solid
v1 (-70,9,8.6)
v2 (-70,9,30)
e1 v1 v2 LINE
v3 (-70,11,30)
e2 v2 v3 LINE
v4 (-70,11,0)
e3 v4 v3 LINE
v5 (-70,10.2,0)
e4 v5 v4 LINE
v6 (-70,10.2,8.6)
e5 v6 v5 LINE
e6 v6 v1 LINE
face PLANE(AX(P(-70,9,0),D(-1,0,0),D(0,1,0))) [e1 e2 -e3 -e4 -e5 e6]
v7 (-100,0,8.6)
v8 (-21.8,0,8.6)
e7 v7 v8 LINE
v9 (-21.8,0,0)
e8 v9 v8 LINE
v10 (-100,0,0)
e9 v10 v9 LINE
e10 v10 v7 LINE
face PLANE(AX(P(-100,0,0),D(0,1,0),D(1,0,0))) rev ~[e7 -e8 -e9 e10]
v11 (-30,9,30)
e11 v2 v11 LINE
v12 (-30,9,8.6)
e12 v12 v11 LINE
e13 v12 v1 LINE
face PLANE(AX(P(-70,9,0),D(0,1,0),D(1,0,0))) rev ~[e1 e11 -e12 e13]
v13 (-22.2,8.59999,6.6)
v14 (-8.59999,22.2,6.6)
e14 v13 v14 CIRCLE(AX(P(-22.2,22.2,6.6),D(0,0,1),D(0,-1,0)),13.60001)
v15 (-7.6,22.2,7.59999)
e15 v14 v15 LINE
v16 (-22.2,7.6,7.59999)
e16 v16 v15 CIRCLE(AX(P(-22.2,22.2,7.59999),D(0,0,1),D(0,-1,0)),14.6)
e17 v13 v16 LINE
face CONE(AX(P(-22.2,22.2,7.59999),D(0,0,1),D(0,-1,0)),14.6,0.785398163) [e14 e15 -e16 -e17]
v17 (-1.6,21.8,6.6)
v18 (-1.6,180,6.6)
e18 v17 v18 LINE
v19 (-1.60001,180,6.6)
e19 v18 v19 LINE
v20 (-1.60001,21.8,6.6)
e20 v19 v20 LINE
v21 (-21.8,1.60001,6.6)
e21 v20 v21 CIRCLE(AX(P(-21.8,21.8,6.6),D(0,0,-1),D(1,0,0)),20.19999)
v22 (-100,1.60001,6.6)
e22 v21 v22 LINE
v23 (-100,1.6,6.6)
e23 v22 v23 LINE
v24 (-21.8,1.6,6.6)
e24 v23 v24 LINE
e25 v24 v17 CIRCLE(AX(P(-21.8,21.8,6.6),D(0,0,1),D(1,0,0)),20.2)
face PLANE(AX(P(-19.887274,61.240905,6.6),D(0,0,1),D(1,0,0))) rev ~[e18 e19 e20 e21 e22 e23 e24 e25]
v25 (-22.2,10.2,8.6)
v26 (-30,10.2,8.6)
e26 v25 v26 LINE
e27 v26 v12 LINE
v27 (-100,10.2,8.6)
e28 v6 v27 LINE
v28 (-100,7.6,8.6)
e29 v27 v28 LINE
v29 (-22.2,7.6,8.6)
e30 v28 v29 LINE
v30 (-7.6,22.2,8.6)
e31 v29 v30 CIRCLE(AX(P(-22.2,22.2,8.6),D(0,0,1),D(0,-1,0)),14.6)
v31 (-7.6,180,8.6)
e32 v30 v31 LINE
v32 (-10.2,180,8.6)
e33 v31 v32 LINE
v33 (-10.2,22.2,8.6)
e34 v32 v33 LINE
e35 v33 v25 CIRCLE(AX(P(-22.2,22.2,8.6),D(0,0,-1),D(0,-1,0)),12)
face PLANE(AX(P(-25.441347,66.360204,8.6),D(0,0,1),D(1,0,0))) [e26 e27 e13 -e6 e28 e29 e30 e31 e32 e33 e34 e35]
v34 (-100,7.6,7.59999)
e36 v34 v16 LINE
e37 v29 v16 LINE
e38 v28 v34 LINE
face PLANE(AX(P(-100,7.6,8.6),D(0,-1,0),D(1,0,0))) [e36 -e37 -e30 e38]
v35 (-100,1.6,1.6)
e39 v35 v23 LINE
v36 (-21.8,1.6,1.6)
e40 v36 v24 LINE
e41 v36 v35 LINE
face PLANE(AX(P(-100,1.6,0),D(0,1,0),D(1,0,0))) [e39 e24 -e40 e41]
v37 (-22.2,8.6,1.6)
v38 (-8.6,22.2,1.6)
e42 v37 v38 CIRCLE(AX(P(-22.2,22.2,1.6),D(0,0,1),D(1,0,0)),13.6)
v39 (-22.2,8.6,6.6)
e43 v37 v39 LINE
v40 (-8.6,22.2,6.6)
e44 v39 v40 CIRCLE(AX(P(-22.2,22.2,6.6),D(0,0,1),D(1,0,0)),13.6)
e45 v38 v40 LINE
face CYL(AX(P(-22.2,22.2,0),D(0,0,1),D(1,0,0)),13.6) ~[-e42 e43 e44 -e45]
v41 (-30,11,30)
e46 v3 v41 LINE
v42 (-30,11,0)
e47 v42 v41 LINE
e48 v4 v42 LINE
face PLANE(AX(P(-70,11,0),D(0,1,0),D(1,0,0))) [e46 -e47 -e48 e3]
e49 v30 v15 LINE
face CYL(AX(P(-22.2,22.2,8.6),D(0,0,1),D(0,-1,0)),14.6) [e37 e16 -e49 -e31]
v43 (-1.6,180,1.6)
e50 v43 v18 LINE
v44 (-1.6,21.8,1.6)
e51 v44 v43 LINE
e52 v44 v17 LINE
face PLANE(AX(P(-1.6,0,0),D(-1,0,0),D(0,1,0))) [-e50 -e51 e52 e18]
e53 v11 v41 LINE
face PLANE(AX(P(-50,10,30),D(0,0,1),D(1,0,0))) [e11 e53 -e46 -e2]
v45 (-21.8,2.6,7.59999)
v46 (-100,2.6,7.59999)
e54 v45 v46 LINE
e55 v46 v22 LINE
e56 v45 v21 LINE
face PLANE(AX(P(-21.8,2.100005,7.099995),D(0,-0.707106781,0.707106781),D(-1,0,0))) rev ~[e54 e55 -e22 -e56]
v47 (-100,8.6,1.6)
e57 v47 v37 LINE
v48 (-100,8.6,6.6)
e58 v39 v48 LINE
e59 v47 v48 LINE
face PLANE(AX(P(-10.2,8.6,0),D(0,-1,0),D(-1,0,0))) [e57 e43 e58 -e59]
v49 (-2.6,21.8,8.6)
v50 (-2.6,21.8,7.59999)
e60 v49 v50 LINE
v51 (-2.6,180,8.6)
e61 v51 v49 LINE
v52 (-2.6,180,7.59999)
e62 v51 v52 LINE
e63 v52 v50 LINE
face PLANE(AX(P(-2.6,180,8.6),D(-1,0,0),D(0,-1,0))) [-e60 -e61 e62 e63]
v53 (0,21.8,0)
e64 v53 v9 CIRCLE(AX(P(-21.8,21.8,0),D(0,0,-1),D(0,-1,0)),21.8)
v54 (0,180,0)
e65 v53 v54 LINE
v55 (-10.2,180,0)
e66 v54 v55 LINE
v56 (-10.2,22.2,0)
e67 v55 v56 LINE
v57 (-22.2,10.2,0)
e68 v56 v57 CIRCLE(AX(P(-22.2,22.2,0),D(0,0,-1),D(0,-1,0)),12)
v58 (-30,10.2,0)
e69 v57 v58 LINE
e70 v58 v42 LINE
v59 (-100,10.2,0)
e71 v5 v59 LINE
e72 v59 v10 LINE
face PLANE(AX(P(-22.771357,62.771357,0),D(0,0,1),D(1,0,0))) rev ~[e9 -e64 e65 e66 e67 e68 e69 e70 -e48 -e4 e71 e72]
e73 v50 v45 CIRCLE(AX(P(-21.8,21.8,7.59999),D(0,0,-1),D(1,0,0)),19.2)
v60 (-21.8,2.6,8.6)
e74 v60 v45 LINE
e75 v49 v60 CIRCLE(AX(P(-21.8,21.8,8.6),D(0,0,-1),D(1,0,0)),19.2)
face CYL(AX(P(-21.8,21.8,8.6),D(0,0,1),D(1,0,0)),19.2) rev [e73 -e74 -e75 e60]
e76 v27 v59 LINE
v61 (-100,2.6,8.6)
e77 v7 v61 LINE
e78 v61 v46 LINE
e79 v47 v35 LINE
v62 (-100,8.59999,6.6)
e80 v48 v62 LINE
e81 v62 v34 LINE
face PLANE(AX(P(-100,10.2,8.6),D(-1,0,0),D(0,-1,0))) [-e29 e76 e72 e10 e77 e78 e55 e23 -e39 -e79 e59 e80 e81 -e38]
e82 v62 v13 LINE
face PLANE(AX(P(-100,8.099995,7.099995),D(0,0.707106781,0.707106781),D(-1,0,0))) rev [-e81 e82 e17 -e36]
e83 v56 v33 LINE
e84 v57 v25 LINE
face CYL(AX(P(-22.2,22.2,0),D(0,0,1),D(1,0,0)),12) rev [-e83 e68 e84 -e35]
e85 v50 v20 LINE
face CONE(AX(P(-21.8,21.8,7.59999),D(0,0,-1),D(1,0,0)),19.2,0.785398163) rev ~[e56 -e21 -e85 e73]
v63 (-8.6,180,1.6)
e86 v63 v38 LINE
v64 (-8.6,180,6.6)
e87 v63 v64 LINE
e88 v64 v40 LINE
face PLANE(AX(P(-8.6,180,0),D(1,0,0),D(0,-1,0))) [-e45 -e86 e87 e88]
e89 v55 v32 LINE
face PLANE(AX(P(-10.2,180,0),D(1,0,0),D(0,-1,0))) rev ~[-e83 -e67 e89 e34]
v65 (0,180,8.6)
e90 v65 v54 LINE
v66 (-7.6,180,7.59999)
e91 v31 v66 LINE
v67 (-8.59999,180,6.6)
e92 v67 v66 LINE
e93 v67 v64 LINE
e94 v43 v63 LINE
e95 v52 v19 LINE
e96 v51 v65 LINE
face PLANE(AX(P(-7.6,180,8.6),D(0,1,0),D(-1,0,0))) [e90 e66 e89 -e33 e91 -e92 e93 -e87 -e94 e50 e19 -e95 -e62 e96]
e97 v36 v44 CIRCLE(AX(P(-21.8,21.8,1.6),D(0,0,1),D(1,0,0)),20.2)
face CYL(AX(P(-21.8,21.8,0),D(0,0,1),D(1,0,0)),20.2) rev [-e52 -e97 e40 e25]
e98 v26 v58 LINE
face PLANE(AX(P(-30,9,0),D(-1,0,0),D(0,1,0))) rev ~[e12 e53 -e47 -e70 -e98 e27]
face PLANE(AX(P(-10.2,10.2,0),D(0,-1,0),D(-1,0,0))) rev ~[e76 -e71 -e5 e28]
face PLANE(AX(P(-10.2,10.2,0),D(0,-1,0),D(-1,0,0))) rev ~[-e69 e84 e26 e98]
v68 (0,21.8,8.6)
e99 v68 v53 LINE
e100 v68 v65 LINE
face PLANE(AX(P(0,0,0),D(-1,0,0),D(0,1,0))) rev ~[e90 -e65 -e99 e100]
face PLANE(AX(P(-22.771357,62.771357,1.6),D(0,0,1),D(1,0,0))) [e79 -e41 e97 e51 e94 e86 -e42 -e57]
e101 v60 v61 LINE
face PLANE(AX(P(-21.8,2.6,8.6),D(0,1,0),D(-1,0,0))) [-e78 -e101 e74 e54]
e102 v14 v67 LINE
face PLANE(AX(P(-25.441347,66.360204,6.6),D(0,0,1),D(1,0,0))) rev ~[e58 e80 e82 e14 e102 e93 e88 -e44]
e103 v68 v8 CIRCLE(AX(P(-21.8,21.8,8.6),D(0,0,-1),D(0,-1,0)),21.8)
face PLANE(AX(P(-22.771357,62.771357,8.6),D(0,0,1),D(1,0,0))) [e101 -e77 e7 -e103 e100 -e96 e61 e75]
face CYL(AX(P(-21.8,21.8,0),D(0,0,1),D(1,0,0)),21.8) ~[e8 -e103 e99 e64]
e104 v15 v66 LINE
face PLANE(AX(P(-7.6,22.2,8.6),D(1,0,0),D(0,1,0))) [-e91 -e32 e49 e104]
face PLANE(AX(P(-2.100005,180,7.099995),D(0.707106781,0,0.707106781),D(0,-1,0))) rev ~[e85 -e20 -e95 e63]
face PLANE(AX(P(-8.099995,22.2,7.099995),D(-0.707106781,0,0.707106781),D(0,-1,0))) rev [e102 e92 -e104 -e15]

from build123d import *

# Parameters (mm, degrees)
F1_DEPTH = 8.6
F2_R     = 12
F3_R     = 21.8
F4_T     = -1.6
F6_DEPTH = 2
F7_SIZE  = 0.99999
F8_W     = 40
F8_H     = 2
F9_DEPTH = 30


# Not quite as in the source:
# - a fillet or chamfer is up to 0.001 mm smaller than in the source, because OpenCascade refuses the exact size


with BuildPart() as f1:
    # F0 (on Top) → F1 (new body)
    with BuildSketch(Plane.XY):
        Polygon((0, 0), (0, 180), (-10.2, 180), (-10.2, 10.2), (-100, 10.2), (-100, 0), align=None)
    extrude(amount=F1_DEPTH)

    # F2
    f2_edges = [f1.edges().sort_by_distance(p)[0] for p in [
        (-10.2, 10.2, 4.3),
    ]]
    fillet(f2_edges, radius=F2_R)

    # F3
    f3_edges = [f1.edges().sort_by_distance(p)[0] for p in [
        (0, 0, 4.3),
    ]]
    fillet(f3_edges, radius=F3_R)

    # F4
    f4_openings = [f1.faces().sort_by_distance(p)[0] for p in [
        (-100, 5.1, 4.3),
        (-2.059126, 100.9, 8.6),
        (-5.1, 180, 4.3),
    ]]
    offset(amount=F4_T, openings=f4_openings)

    # F5 (on face) → F6 (join)
    with BuildSketch(Plane.XY.offset(8.6)):
        with BuildLine():
            ThreePointArc((-22.2, 7.6), (-11.8762409947, 11.8762409947), (-7.6, 22.2))
            Line((-7.6, 22.2), (-7.6, 180))
            Line((-7.6, 180), (-10.2, 180))
            Line((-10.2, 180), (-10.2, 22.2))
            ThreePointArc((-10.2, 22.2), (-13.7147186258, 13.7147186258), (-22.2, 10.2))
            Line((-22.2, 10.2), (-100, 10.2))
            Line((-100, 10.2), (-100, 7.6))
            Line((-100, 7.6), (-22.2, 7.6))
        make_face()
        with BuildLine():
            Line((0, 21.8), (0, 180))
            Line((0, 180), (-2.6, 180))
            Line((-2.6, 180), (-2.6, 21.8))
            ThreePointArc((-2.6, 21.8), (-8.2235498012, 8.2235498012), (-21.8, 2.6))
            Line((-21.8, 2.6), (-100, 2.6))
            Line((-100, 2.6), (-100, 0))
            Line((-100, 0), (-21.8, 0))
            ThreePointArc((-21.8, 0), (-6.3850721701, 6.3850721701), (0, 21.8))
        make_face()
    extrude(amount=-F6_DEPTH)

    # F7 (size 1 in the source; OpenCascade refuses exactly that, so slightly less here)
    f7_edges = [f1.edges().sort_by_distance(p)[0] for p in [
        (-61.1, 7.6, 6.6),
        (-60.9, 2.6, 6.6),
    ]]
    chamfer(f7_edges, length=F7_SIZE)

    # F8 (on Top) → F9 (join)
    with BuildSketch(Plane.XY):
        with Locations((-50, 10)):
            Rectangle(F8_W, F8_H)
    extrude(amount=F9_DEPTH)


solid = f1.part
